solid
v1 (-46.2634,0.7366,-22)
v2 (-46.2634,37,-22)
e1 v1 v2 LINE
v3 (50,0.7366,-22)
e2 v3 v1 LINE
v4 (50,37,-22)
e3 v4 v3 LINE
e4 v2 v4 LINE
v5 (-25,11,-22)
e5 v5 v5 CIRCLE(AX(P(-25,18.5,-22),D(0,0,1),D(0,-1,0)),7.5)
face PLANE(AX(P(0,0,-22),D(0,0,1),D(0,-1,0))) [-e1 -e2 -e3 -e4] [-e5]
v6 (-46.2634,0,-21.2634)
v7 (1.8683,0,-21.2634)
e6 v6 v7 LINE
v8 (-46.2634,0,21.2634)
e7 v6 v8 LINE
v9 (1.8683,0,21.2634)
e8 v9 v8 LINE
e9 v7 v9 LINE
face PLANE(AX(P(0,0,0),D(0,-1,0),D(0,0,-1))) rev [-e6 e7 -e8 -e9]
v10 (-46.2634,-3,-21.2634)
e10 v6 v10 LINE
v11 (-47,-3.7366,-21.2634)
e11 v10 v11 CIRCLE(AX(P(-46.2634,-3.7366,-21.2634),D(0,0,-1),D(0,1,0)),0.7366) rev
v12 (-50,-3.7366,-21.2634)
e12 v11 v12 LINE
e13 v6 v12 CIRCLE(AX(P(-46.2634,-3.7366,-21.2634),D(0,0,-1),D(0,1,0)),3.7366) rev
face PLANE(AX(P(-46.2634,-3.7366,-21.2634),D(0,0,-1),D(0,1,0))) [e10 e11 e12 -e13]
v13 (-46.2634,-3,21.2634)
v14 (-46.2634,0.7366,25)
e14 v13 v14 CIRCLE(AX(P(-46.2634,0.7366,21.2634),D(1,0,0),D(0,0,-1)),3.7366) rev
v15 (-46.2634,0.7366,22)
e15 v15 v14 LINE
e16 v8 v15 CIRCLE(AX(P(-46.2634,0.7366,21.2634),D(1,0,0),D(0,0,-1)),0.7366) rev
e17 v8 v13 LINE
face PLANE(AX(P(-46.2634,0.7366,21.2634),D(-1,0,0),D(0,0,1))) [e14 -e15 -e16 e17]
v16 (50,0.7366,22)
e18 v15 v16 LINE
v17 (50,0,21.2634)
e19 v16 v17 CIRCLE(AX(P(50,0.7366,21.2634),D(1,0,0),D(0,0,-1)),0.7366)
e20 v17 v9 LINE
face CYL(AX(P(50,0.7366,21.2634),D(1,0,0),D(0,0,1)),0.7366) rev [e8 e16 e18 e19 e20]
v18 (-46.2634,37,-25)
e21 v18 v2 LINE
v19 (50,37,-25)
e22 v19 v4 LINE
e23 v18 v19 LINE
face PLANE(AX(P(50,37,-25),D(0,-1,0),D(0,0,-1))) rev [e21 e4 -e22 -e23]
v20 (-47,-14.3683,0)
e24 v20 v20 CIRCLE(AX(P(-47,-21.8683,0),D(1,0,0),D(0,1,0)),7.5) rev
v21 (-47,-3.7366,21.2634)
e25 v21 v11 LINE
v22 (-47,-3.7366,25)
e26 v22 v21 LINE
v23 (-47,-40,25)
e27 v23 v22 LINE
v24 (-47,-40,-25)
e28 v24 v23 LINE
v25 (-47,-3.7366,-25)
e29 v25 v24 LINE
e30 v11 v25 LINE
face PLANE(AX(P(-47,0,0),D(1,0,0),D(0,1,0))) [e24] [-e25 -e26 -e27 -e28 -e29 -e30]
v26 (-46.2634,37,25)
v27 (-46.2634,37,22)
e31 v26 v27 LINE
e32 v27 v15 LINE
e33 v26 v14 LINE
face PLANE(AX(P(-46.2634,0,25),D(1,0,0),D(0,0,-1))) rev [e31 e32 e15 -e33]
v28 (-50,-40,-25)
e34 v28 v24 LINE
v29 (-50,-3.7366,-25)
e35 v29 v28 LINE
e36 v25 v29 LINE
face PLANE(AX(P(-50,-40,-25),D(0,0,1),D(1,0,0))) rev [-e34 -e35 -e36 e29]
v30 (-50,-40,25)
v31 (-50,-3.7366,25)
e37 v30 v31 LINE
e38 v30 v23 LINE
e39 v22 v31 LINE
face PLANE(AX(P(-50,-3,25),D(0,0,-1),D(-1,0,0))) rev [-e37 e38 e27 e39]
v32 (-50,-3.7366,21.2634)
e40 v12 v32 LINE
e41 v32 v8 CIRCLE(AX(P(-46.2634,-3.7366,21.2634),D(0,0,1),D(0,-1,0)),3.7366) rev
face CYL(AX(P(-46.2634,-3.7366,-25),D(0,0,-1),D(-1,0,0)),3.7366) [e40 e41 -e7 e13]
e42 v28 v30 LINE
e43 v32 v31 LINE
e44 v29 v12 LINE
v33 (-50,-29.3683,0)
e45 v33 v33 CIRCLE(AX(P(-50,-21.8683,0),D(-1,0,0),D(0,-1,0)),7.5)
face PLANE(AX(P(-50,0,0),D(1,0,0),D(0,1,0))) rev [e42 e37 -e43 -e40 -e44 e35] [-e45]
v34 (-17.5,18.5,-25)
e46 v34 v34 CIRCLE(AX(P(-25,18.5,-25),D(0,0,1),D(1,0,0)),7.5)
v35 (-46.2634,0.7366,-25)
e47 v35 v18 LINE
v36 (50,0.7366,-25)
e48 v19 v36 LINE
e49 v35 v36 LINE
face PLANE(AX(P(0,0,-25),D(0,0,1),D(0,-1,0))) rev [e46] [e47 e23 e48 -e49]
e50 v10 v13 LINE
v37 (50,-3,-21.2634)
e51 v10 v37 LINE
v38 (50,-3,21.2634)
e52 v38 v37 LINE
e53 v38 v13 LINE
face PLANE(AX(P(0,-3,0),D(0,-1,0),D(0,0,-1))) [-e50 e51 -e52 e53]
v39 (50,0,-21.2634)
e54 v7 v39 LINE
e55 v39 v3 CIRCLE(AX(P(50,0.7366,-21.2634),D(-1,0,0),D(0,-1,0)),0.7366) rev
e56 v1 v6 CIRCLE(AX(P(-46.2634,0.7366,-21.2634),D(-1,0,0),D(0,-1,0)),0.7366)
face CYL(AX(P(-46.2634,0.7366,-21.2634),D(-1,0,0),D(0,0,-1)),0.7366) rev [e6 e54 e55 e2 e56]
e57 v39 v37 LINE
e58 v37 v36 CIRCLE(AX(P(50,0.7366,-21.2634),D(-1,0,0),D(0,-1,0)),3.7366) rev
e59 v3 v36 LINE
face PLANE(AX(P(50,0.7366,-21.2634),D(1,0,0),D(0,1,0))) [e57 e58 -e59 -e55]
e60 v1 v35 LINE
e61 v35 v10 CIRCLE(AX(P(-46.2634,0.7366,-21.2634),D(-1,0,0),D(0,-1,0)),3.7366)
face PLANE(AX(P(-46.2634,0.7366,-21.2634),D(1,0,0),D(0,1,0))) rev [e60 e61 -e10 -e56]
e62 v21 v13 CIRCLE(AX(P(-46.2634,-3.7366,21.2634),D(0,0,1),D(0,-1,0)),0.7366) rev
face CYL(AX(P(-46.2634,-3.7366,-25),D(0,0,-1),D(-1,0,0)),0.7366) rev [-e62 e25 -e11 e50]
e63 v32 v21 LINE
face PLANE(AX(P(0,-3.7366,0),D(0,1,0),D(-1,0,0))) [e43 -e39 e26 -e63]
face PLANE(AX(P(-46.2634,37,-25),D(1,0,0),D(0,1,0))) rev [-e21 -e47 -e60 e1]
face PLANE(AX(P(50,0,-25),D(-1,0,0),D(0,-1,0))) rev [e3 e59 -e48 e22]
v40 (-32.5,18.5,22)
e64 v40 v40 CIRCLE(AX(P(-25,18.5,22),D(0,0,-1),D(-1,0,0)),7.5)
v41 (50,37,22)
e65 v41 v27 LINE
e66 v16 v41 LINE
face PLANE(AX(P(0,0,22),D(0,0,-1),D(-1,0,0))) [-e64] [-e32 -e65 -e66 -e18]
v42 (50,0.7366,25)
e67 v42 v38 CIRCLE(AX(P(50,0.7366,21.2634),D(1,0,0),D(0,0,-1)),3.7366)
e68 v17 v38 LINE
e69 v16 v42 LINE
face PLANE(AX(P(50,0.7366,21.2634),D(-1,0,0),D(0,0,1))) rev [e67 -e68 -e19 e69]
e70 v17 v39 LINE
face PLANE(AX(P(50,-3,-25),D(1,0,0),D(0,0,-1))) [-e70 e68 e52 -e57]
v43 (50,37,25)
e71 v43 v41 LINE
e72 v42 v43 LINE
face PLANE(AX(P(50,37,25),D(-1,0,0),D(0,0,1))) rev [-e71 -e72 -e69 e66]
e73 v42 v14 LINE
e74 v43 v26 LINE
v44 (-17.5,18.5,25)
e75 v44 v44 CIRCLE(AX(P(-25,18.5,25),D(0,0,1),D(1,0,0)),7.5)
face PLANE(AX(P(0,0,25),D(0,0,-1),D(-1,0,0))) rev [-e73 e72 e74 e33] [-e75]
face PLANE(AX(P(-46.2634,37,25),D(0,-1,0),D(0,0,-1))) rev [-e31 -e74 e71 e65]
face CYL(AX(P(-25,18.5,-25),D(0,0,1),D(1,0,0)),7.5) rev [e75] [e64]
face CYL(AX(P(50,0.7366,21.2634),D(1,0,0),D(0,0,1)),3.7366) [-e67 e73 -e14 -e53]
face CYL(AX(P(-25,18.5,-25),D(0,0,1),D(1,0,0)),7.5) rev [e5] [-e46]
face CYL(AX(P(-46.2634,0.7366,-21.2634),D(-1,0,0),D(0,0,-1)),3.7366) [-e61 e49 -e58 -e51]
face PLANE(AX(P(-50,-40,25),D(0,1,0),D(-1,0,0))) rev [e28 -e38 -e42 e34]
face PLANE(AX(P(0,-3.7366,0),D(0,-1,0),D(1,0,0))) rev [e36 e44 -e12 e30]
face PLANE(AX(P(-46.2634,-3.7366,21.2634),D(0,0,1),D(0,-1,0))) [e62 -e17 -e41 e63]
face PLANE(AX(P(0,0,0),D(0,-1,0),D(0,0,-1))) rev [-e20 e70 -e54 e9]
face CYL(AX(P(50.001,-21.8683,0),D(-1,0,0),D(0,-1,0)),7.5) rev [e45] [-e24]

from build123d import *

# Parameters (mm, degrees)
SKETCH1_W                    = 100
SKETCH1_H                    = 50
BASE_FLANGE1_DEPTH           = 3
EDGE_FLANGE1_STRIP_W         = 13.4732
EDGE_FLANGE1_STRIP_H         = 3
EDGE_FLANGE1_STRIP_CUT_DEPTH = 50
EDGE_FLANGE1_DEPTH           = 50
EDGE_FLANGE2_START           = -50
EDGE_FLANGE2_DEPTH           = 100
EDGE_FLANGE2_2_DEPTH         = 3.7366
EDGE_FLANGE2_START_2         = -46.2634
EDGE_FLANGE2_3_DEPTH         = 96.2634
SKETCH15_R                   = 7.5
CUT_EXTRUDE1_DEPTH           = 82.240384046
CUT_EXTRUDE2_REACH           = 112.567
SKETCH16_R                   = 7.5


# Read off the part's stored shape, not the designer's step: Edge-Flange2
# Sheet-metal steps are written as plain solids
with BuildPart() as part:
    # Sketch1 → Base-Flange1 (new body)
    with BuildSketch(Plane(origin=(0, 0, 0), x_dir=(1, 0, 0), z_dir=(0, 1, 0))):
        Rectangle(SKETCH1_W, SKETCH1_H)
    extrude(amount=-BASE_FLANGE1_DEPTH)

    # Edge-Flange1 strip (across the edge) → Edge-Flange1 strip cut (cut)
    with BuildSketch(Plane(origin=(-50, -3, 25), x_dir=(1, 0, 0), z_dir=(0, 0, -1))):
        with Locations((-3, -1.5)):
            Rectangle(EDGE_FLANGE1_STRIP_W, EDGE_FLANGE1_STRIP_H)
    extrude(amount=EDGE_FLANGE1_STRIP_CUT_DEPTH, mode=Mode.SUBTRACT)

    # Edge-Flange1 section (across the edge) → Edge-Flange1 (add)
    with BuildSketch(Plane(origin=(-50, -3, 25), x_dir=(1, 0, 0), z_dir=(0, 0, -1))):
        with BuildLine():
            Line((0, 0.7366), (0, 37))
            Line((0, 37), (3, 37))
            Line((3, 37), (3, 0.7366))
            ThreePointArc((3, 0.7366), (3.215745145, 0.215745145), (3.7366, 0))
            Line((3.7366, 0), (3.7366, -3))
            ThreePointArc((3.7366, -3), (1.094424801, -1.905575199), (0, 0.7366))
        make_face()
    extrude(amount=EDGE_FLANGE1_DEPTH)

    # Edge-Flange2 outline → Edge-Flange2 (cut)
    with BuildSketch(Plane.YZ.offset(EDGE_FLANGE2_START)):
        with BuildLine():
            Line((-3, -21.2634), (-3.7366, -21.2634))
            Line((-3.7366, -21.2634), (-3.7366, -25))
            Line((-3.7366, -25), (0, -25))
            Line((0, -25), (0, -24.926677222))
            ThreePointArc((0, -24.926677222), (-2.154295979, -23.630867001), (-3, -21.2634))
        make_face()
        with BuildLine():
            Line((0, 25), (-3.7366, 25))
            Line((-3.7366, 25), (-3.7366, 21.2634))
            Line((-3.7366, 21.2634), (-3, 21.2634))
            ThreePointArc((-3, 21.2634), (-2.154295979, 23.630867001), (0, 24.926677222))
            Line((0, 24.926677222), (0, 25))
        make_face()
    extrude(amount=EDGE_FLANGE2_DEPTH, mode=Mode.SUBTRACT)

    # Edge-Flange2 2 outline → Edge-Flange2 2 (cut)
    with BuildSketch(Plane.YZ.offset(EDGE_FLANGE2_START)):
        with BuildLine():
            Line((0, -21.2634), (-3, -21.2634))
            ThreePointArc((-3, -21.2634), (-2.154295979, -23.630867001), (0, -24.926677222))
            Line((0, -24.926677222), (0, -21.2634))
        make_face()
        with BuildLine():
            ThreePointArc((0, 24.926677222), (-2.154295979, 23.630867001), (-3, 21.2634))
            Line((-3, 21.2634), (0, 21.2634))
            Line((0, 21.2634), (0, 24.926677222))
        make_face()
    extrude(amount=EDGE_FLANGE2_2_DEPTH, mode=Mode.SUBTRACT)

    # Edge-Flange2 3 outline → Edge-Flange2 3 (add)
    with BuildSketch(Plane.YZ.offset(EDGE_FLANGE2_START_2)):
        with BuildLine():
            ThreePointArc((0.7366, -22), (0.215745145, -21.784254855), (0, -21.2634))
            Line((0, -21.2634), (0, -24.926677222))
            ThreePointArc((0, -24.926677222), (0.36647982, -24.981624121), (0.7366, -25))
            Line((0.7366, -25), (37, -25))
            Line((37, -25), (37, -22))
            Line((37, -22), (0.7366, -22))
        make_face()
        with BuildLine():
            Line((0, 24.926677222), (0, 21.2634))
            ThreePointArc((0, 21.2634), (0.215745145, 21.784254855), (0.7366, 22))
            Line((0.7366, 22), (37, 22))
            Line((37, 22), (37, 25))
            Line((37, 25), (0.7366, 25))
            ThreePointArc((0.7366, 25), (0.36647982, 24.981624121), (0, 24.926677222))
        make_face()
    extrude(amount=EDGE_FLANGE2_3_DEPTH)

    # Sketch15 → Cut-Extrude1 (cut, through all)
    with BuildSketch(Plane.XY.offset(25)):
        with Locations((-25, 18.5)):
            Circle(SKETCH15_R)
    extrude(amount=-CUT_EXTRUDE1_DEPTH, mode=Mode.SUBTRACT)

    # Sketch16 → Cut-Extrude2 (cut, up to next)
    with BuildSketch(Plane.ZY.offset(50), mode=Mode.PRIVATE) as cut_extrude2_sk1:
        with Locations(Location((0, -21.8683, 0), (0, 0, 270))):
            Circle(SKETCH16_R)
    cut_extrude2_tool1 = extrude(cut_extrude2_sk1.sketch, amount=-CUT_EXTRUDE2_REACH, mode=Mode.PRIVATE) & part.part
    add(cut_extrude2_tool1.solids().sort_by_distance((-50, -21.8683, 0))[0], mode=Mode.SUBTRACT)


solid = part.part
